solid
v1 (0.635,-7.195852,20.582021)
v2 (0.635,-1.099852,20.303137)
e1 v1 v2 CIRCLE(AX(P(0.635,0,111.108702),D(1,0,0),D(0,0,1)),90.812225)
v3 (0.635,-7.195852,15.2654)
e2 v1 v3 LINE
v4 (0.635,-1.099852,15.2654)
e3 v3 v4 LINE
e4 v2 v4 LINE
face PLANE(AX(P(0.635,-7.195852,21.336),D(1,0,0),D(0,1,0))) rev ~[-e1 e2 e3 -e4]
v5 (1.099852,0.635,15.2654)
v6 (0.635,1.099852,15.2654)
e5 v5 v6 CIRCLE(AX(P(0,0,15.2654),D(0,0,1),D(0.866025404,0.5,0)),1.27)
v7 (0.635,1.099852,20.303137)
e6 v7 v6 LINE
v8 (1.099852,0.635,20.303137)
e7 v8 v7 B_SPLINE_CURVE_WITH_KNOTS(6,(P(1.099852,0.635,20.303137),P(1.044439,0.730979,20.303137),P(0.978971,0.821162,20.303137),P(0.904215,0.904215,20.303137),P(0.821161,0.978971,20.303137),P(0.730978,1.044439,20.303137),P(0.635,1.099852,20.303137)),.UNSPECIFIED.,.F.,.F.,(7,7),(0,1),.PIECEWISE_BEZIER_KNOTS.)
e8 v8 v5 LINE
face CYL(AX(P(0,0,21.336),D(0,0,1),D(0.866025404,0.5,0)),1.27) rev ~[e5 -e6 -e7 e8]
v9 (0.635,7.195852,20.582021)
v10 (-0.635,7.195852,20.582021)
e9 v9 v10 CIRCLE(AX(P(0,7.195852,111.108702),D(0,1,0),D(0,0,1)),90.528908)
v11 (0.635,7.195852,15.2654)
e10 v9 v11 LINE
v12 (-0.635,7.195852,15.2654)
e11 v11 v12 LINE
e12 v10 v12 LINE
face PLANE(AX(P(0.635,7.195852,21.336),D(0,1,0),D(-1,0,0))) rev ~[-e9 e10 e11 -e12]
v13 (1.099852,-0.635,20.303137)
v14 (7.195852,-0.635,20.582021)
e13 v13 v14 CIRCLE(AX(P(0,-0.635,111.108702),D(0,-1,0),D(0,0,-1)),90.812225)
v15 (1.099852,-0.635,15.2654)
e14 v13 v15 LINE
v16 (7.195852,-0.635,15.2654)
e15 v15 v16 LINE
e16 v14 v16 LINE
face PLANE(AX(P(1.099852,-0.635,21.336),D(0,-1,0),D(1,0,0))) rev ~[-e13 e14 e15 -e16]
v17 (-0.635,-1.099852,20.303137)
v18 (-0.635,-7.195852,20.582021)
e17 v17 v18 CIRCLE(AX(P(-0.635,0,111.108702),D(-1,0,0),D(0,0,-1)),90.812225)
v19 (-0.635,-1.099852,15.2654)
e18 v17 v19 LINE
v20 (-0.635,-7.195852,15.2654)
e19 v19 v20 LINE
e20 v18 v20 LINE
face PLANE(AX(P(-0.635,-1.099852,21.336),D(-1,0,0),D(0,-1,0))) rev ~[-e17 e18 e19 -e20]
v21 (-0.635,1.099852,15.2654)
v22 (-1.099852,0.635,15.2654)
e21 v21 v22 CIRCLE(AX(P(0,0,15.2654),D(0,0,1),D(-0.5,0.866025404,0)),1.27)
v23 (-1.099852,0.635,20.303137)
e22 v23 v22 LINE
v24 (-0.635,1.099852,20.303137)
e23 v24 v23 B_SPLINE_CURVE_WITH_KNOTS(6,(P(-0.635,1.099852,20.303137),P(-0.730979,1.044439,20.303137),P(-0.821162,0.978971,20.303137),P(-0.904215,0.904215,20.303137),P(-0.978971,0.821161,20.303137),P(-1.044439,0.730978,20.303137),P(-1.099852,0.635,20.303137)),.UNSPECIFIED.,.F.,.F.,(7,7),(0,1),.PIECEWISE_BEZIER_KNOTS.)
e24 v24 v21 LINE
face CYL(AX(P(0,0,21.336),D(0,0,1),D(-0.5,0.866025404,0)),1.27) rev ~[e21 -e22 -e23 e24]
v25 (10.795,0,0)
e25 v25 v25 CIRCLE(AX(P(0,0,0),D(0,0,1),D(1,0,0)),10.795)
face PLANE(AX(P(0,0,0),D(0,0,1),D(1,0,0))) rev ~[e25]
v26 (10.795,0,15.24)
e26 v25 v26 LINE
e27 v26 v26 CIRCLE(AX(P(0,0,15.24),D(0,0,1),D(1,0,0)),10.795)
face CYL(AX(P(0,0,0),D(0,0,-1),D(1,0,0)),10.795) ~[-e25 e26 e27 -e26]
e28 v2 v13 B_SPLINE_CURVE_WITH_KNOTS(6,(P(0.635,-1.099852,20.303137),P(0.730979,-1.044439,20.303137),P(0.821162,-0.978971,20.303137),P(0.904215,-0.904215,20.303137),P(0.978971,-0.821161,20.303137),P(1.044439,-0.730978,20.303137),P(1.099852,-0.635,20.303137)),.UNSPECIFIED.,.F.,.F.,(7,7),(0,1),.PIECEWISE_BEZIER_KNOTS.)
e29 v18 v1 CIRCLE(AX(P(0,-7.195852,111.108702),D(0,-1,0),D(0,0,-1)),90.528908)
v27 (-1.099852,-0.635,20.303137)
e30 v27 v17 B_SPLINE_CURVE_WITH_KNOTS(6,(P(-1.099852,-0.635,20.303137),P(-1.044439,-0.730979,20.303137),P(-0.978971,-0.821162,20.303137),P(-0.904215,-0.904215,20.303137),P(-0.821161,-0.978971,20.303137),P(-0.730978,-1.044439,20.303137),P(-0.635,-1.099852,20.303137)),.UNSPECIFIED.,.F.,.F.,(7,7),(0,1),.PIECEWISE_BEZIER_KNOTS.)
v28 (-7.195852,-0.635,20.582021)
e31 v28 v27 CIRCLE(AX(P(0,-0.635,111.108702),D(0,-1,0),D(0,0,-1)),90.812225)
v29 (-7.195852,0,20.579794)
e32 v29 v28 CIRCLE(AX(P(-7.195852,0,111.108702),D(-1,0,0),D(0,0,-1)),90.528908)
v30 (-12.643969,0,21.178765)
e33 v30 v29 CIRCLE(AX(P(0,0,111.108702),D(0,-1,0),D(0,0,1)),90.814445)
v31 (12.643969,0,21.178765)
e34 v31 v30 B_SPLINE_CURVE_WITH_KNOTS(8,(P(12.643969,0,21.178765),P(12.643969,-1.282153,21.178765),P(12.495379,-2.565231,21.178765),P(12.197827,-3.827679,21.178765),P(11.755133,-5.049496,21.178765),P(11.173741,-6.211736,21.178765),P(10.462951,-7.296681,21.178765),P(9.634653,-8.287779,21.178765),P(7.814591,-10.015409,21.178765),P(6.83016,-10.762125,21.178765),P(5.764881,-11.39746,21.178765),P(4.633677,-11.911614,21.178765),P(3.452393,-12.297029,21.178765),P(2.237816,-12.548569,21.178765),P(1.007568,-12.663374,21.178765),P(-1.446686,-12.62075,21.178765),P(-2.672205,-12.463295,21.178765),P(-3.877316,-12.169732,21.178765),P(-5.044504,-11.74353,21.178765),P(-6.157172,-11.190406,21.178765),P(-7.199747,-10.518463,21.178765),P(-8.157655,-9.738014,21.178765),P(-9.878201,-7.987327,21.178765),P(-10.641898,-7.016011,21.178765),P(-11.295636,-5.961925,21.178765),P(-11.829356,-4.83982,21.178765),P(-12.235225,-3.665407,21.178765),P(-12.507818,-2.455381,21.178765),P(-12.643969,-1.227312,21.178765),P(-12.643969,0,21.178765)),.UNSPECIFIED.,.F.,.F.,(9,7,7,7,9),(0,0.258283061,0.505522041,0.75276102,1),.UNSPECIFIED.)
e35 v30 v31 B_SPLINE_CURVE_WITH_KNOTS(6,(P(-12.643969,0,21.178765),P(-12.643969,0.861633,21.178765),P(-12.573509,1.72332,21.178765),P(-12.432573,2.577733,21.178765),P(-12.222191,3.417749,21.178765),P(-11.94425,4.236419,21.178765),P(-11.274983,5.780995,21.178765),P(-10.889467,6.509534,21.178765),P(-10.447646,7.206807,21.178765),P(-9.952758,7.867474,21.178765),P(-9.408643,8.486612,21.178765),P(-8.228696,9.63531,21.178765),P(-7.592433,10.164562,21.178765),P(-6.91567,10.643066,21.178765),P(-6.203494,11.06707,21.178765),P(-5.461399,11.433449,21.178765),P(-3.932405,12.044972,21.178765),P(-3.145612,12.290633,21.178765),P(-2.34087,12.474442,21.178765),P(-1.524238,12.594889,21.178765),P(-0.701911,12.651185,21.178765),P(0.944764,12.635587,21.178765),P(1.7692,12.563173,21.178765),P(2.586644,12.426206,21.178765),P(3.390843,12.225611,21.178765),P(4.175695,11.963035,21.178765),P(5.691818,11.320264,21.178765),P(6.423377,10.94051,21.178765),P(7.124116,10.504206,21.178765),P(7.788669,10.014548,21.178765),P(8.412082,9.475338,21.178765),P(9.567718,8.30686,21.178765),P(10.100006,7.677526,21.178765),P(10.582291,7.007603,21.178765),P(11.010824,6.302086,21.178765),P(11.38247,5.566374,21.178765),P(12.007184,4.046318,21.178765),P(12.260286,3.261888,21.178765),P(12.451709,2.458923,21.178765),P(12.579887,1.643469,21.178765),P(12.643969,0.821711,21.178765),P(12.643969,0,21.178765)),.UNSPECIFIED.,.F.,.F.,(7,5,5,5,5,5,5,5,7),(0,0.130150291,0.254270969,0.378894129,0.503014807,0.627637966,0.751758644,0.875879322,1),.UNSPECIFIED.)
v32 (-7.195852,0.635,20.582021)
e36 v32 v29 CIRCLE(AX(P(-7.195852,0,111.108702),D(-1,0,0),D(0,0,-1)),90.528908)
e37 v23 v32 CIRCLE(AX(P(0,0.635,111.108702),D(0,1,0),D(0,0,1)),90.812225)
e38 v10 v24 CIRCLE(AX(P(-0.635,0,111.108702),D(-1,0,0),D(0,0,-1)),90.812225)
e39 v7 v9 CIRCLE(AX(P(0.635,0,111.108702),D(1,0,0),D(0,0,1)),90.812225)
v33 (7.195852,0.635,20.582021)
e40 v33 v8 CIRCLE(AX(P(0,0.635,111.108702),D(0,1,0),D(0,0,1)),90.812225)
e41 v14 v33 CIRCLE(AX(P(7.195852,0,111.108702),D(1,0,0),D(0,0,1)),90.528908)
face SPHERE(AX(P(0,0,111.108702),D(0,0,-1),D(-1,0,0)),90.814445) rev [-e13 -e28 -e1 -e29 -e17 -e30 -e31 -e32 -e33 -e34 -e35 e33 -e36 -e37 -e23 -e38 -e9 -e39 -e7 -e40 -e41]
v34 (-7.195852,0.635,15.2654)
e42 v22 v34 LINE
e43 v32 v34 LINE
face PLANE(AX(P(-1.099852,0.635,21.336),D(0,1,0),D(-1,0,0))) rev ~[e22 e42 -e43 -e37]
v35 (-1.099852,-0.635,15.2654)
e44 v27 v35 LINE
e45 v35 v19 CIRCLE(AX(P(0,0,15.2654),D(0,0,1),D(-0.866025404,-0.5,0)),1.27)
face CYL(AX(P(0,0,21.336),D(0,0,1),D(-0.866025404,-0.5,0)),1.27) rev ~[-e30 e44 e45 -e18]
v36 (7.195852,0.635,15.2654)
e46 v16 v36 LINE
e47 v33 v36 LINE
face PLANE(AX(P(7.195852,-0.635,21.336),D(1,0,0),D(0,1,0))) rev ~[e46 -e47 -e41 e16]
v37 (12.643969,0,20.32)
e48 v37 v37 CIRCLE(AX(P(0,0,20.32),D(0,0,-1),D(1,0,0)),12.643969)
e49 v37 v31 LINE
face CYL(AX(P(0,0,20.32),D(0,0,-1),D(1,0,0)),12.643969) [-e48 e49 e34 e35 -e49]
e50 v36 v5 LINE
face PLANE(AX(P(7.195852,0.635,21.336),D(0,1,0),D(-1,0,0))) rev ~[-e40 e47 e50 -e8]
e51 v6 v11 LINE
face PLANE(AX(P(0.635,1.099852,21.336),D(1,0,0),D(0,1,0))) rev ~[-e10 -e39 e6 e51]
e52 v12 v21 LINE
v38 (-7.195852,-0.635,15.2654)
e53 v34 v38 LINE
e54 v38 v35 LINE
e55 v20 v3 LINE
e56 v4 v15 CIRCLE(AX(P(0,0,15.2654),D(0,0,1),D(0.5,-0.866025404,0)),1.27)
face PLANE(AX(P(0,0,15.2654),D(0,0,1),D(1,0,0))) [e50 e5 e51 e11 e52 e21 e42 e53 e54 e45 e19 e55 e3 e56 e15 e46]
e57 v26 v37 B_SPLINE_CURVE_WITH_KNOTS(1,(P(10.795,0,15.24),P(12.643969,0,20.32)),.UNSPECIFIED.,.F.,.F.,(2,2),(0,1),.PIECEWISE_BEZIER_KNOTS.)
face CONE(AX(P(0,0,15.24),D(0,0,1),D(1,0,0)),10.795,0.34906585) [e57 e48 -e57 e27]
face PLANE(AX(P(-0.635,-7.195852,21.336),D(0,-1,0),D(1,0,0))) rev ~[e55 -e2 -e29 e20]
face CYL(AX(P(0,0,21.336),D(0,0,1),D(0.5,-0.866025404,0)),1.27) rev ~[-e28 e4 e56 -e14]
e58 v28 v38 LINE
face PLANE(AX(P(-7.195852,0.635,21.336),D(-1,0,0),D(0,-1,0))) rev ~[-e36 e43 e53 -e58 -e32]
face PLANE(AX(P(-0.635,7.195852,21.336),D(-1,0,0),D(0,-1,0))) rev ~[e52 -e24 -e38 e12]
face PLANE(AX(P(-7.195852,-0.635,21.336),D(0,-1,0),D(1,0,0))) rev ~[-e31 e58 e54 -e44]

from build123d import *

# Parameters (mm, degrees)
F0_R      = 10.795
F1_DEPTH  = 15.24
F1_FACE_R = 10.795
F2_DEPTH  = 5.08
F2_TAPER  = -20
F3_DEPTH  = 1.016
F5_DEPTH  = 6.0706


with BuildPart() as f1:
    # F0 (on Top) → F1 (new body)
    with BuildSketch(Plane.XY):
        Circle(F0_R)
    extrude(amount=F1_DEPTH)

    # F1_face (on face) → F2 (join)
    with BuildSketch(Plane.XY.offset(15.24)):
        Circle(F1_FACE_R)
    extrude(amount=F2_DEPTH, taper=F2_TAPER)

    # F3 (add): a face of the model
    f3_faces = [f1.faces().sort_by_distance(p)[0] for p in [
        (0, 0, 20.32),
    ]]
    extrude(f3_faces, amount=F3_DEPTH)

    # F4 (on face) → F5 (cut)
    with BuildSketch(Plane.XY.offset(21.336)):
        with BuildLine():
            Line((0.635, 7.1958522628), (-0.635, 7.1958522628))
            Line((-0.635, 7.1958522628), (-0.635, 1.0998522628))
            ThreePointArc((-0.635, 1.0998522628), (-0.8980256121, 0.8980256121), (-1.0998522628, 0.635))
            Line((-1.0998522628, 0.635), (-7.1958522628, 0.635))
            Line((-7.1958522628, 0.635), (-7.1958522628, -0.635))
            Line((-7.1958522628, -0.635), (-1.0998522628, -0.635))
            ThreePointArc((-1.0998522628, -0.635), (-0.8980256121, -0.8980256121), (-0.635, -1.0998522628))
            Line((-0.635, -1.0998522628), (-0.635, -7.1958522628))
            Line((-0.635, -7.1958522628), (0.635, -7.1958522628))
            Line((0.635, -7.1958522628), (0.635, -1.0998522628))
            ThreePointArc((0.635, -1.0998522628), (0.8980256121, -0.8980256121), (1.0998522628, -0.635))
            Line((1.0998522628, -0.635), (7.1958522628, -0.635))
            Line((7.1958522628, -0.635), (7.1958522628, 0.635))
            Line((7.1958522628, 0.635), (1.0998522628, 0.635))
            ThreePointArc((1.0998522628, 0.635), (0.8980256121, 0.8980256121), (0.635, 1.0998522628))
            Line((0.635, 1.0998522628), (0.635, 7.1958522628))
        make_face()
    extrude(amount=-F5_DEPTH, mode=Mode.SUBTRACT)

    # F6 (on Front) → F7 (revolve, cut)
    with BuildSketch(Plane.XZ):
        with BuildLine():
            ThreePointArc((0, 201.9231468439), (-90.8144451678, 111.1087016761), (0, 20.2942565084))
            Line((0, 20.2942565084), (0, 201.9231468439))
        make_face()
    revolve(axis=Axis((0, 0, 111.1087016761), (0, 0, 1)), mode=Mode.SUBTRACT)


solid = f1.part
